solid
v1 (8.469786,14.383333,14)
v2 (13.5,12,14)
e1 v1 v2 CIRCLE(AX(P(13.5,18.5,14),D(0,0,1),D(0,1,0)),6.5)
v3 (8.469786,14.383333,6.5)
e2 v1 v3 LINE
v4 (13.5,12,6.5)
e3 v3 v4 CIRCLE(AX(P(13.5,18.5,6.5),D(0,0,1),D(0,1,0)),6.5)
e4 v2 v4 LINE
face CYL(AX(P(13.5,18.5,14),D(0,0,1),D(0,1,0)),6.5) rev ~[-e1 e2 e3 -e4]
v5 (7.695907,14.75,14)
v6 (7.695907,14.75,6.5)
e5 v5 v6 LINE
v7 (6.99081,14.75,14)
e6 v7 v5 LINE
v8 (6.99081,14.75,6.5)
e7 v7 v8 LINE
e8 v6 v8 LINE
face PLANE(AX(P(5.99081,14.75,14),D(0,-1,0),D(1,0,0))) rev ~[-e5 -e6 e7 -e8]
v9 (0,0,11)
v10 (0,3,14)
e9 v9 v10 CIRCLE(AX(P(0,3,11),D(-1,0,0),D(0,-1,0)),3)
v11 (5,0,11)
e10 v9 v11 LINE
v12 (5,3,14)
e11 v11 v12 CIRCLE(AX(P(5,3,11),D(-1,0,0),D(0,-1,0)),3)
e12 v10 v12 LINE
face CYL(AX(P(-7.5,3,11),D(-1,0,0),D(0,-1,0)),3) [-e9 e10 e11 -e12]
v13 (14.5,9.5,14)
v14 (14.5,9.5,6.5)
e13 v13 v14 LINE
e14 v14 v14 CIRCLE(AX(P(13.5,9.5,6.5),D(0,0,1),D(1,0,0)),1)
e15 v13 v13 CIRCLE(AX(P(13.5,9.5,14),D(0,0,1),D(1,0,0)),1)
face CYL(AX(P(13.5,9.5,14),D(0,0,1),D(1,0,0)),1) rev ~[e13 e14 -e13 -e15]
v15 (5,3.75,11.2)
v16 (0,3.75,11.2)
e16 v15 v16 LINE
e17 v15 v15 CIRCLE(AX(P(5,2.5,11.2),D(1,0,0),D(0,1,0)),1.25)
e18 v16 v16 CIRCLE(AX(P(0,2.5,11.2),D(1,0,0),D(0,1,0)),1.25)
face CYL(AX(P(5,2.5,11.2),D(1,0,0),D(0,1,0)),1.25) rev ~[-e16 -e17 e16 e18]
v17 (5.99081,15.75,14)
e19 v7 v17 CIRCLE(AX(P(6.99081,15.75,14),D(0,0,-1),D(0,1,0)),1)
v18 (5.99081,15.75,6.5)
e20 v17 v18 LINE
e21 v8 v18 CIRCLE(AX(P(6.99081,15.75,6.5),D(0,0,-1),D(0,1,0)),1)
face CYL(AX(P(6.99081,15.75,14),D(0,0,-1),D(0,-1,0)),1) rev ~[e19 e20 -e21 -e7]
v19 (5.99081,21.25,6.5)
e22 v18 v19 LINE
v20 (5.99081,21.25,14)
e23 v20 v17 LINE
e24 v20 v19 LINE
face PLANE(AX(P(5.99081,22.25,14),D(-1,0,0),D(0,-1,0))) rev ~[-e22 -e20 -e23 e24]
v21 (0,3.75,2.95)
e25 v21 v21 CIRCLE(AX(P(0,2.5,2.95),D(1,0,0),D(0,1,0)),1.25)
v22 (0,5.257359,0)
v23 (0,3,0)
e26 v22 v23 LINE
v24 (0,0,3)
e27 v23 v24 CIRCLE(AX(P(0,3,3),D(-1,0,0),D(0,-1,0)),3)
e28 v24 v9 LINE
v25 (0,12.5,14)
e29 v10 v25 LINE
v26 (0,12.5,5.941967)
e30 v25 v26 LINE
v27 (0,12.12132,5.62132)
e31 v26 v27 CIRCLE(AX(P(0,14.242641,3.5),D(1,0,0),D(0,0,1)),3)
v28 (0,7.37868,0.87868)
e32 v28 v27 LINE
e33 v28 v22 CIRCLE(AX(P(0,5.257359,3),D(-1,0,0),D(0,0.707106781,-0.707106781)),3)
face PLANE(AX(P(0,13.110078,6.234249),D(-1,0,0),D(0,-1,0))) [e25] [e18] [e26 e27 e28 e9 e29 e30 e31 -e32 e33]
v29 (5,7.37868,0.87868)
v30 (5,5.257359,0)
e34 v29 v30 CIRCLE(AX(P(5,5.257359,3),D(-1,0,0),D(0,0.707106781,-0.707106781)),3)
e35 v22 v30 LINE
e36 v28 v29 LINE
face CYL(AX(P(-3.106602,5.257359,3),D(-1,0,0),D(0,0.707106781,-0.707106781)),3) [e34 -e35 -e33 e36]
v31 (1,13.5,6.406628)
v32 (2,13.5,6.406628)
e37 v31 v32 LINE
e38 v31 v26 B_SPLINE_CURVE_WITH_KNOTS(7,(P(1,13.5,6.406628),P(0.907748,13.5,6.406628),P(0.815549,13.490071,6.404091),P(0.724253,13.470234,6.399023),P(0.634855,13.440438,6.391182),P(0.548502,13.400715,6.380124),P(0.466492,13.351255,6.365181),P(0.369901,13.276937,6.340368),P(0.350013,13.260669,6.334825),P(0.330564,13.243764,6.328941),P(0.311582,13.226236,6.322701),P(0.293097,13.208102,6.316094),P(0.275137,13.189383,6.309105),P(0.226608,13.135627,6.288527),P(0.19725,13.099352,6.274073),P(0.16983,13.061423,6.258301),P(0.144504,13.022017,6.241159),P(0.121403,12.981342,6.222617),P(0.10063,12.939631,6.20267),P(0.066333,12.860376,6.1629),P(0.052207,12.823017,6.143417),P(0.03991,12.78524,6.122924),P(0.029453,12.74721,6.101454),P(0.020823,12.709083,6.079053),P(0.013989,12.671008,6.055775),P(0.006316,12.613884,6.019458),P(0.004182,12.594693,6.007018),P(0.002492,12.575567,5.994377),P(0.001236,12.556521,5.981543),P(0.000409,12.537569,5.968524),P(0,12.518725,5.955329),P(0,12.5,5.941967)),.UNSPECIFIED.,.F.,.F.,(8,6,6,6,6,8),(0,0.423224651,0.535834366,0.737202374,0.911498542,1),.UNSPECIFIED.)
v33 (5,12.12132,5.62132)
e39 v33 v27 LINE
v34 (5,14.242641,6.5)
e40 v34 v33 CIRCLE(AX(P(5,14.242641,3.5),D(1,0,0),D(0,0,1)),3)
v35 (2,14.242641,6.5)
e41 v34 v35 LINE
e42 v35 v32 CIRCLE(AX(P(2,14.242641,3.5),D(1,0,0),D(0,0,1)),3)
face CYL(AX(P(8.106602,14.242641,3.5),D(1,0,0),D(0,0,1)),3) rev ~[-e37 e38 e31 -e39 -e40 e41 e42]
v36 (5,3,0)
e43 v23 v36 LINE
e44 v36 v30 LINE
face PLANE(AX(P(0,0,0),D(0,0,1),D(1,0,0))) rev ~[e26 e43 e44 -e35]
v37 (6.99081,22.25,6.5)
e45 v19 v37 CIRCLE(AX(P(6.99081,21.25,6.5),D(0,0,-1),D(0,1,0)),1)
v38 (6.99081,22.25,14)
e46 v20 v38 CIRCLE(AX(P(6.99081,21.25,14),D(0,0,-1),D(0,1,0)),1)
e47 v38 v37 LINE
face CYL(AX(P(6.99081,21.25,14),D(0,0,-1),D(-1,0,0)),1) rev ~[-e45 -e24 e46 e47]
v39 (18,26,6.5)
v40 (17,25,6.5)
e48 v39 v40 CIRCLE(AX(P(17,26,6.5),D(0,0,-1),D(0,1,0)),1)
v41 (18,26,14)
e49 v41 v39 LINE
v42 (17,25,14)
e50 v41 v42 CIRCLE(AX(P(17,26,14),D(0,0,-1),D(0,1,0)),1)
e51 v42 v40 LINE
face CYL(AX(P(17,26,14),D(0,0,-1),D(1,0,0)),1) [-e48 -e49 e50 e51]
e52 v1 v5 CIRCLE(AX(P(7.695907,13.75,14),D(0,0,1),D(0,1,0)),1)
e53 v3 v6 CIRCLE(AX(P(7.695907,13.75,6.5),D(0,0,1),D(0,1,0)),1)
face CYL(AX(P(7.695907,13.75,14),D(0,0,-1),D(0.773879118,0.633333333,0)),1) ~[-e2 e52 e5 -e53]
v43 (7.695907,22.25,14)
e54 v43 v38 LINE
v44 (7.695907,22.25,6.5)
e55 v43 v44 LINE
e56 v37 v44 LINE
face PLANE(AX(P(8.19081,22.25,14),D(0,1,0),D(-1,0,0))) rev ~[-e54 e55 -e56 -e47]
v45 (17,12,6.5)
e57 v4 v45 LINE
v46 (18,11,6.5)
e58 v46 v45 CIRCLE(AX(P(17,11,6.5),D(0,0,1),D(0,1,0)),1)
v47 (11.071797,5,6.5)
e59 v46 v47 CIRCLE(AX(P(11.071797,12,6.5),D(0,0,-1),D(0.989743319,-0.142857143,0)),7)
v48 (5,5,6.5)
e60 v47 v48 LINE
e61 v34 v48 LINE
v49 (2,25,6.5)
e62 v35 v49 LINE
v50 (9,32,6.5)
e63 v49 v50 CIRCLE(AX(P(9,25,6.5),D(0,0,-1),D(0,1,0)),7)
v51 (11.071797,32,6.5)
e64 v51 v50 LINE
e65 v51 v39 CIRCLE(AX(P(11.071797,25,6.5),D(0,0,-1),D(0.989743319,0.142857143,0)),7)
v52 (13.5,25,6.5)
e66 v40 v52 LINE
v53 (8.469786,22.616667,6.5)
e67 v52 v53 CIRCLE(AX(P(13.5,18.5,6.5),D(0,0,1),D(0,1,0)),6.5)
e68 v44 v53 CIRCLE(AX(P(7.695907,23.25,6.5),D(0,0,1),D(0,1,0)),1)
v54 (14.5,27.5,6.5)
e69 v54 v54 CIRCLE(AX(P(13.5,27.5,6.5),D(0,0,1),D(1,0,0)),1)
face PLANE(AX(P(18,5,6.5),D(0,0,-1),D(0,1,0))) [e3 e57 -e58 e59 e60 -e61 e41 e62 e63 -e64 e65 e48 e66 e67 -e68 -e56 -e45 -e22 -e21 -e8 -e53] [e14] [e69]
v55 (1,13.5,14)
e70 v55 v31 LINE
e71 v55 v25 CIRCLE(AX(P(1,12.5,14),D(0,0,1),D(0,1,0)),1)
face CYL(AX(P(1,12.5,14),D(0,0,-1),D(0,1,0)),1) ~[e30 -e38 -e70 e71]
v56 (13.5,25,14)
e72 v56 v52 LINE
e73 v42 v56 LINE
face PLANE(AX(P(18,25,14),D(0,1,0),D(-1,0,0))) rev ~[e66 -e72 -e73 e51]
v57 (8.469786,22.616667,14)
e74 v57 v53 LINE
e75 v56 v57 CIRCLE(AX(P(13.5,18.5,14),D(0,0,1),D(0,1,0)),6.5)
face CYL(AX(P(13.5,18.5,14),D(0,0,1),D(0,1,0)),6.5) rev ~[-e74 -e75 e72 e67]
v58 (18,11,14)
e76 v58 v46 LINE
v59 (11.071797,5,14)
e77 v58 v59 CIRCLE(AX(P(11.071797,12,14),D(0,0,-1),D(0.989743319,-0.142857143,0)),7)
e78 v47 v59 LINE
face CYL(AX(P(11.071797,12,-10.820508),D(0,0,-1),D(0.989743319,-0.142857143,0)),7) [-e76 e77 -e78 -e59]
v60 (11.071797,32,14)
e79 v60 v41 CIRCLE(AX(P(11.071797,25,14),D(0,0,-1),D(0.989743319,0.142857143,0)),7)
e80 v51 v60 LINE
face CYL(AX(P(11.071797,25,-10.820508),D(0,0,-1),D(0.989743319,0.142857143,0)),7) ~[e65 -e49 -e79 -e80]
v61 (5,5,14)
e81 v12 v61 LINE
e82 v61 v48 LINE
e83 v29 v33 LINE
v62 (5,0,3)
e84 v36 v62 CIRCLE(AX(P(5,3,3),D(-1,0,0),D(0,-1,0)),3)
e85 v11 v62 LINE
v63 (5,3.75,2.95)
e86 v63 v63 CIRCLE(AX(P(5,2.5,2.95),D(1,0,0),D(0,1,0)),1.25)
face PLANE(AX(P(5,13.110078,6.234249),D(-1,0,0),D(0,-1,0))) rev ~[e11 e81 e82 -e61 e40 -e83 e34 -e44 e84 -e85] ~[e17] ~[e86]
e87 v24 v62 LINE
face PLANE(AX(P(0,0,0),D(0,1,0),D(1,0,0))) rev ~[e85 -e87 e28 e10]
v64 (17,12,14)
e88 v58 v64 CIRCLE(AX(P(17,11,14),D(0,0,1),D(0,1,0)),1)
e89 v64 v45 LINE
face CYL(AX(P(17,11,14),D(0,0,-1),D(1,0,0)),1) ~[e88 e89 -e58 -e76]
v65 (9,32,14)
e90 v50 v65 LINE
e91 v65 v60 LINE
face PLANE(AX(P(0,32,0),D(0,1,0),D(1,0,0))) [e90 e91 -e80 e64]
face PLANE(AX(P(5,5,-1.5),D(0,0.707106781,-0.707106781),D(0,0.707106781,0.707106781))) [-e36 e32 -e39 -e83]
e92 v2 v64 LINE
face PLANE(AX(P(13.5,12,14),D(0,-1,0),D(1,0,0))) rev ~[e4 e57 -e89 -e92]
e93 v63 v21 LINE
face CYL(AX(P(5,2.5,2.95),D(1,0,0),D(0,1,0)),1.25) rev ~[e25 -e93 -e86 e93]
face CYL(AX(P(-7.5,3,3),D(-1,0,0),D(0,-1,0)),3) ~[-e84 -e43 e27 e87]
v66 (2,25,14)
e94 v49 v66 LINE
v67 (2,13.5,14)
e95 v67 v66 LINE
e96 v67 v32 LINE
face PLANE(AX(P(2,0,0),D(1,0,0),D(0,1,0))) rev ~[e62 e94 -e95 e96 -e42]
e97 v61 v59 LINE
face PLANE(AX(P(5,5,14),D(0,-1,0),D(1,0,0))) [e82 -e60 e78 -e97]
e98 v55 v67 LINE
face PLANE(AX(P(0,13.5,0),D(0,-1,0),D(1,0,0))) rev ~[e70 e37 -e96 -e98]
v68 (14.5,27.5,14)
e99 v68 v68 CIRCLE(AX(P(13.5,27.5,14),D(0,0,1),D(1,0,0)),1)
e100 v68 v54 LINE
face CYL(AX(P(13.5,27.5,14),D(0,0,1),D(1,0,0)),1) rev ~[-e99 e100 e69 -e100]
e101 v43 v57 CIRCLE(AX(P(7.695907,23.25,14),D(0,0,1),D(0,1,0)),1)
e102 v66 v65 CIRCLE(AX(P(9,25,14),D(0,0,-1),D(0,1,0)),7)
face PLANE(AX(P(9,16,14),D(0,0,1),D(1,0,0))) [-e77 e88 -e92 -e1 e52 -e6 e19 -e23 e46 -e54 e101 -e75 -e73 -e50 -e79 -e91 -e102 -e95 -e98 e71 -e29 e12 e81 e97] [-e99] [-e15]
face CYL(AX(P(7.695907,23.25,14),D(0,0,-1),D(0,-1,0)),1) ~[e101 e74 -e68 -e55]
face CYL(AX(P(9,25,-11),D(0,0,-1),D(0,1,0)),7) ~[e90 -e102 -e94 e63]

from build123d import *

# Parameters (mm, degrees)
F0_W          = 18
F0_H          = 32
F1_DEPTH      = 14
F2_W          = 13
F2_H          = 5
F2_W_2        = 2
F2_H_2        = 18.5
F3_DEPTH      = 14
F4_W          = 27
F4_H          = 6.5
F5_DEPTH      = 18.001
F6_R          = 1
F7_DEPTH      = 7.5
F8_R          = 1.25
F9_DEPTH      = 5
F10_T4_DEPTH  = 5
F11_T4_DEPTH  = 8.1066017178
F11_T9_DEPTH  = 8.1066017178
F11_T12_DEPTH = 20
F11_T14_DEPTH = 11.2132034356
F12_R         = 1
F13_T1_DEPTH  = 42.1410161514
F13_T3_DEPTH  = 42.5
F15_DEPTH     = 14.001
F16_R         = 1


# Not quite as in the source:
# - a fillet or chamfer that OpenCascade refuses, or shapes differently, is made with other operations: its cross-section is extruded or revolved along the edge and cut away or added


with BuildPart() as f1:
    # F0 (on Top) → F1 (new body)
    with BuildSketch(Plane.XY):
        with Locations((9, 16)):
            Rectangle(F0_W, F0_H)
    extrude(amount=F1_DEPTH)

    # F2 (on face) → F3 (cut, through all)
    with BuildSketch(Plane.XY.offset(14)):
        with Locations((11.5, 2.5)):
            Rectangle(F2_W, F2_H)
        with Locations((1, 22.75)):
            Rectangle(F2_W_2, F2_H_2)
    extrude(amount=-F3_DEPTH, mode=Mode.SUBTRACT)

    # F4 (on face) → F5 (cut, through all)
    with BuildSketch(Plane.YZ.offset(18)):
        with Locations((18.5, 3.25)):
            Rectangle(F4_W, F4_H)
    extrude(amount=-F5_DEPTH, mode=Mode.SUBTRACT)

    # F6 (on face) → F7 (cut, through all)
    with BuildSketch(Plane.XY.offset(14)):
        with Locations((13.5, 9.5)):
            Circle(F6_R)
        with BuildLine():
            ThreePointArc((18, 23.1904157598), (15.9251079936, 24.5306592691), (13.5, 25))
            ThreePointArc((13.5, 25), (7, 18.5), (13.5, 12))
            ThreePointArc((13.5, 12), (15.9251079936, 12.4693407309), (18, 13.8095842402))
            Line((18, 13.8095842402), (18, 23.1904157598))
        make_face()
        with Locations((13.5, 27.5)):
            Circle(F6_R)
        with BuildLine():
            Line((18, 25), (13.5, 25))
            ThreePointArc((13.5, 25), (15.9251079936, 24.5306592691), (18, 23.1904157598))
            Line((18, 23.1904157598), (18, 25))
        make_face()
        with BuildLine():
            ThreePointArc((18, 13.8095842402), (15.9251079936, 12.4693407309), (13.5, 12))
            Line((13.5, 12), (18, 12))
            Line((18, 12), (18, 13.8095842402))
        make_face()
    extrude(amount=-F7_DEPTH, mode=Mode.SUBTRACT)

    # F8 (on face) → F9 (cut, through all)
    with BuildSketch(Plane.YZ.offset(5)):
        with Locations((2.5, 11.2)):
            Circle(F8_R)
        with Locations((2.5, 2.95)):
            Circle(F8_R)
    extrude(amount=-F9_DEPTH, mode=Mode.SUBTRACT)

    # F10: chamfer of 8 on 1 edges, made by hand


with BuildPart() as f10_tool2:
    # F10_s3 → F10_t4 (new body)
    with BuildSketch(Plane.YZ.offset(5)):
        Polygon((5, -1.5), (13, 6.5), (5, 6.5), align=None)
    extrude(amount=-F10_T4_DEPTH)

    split(bisect_by=Plane.XY, keep=Keep.TOP)


with BuildPart() as f1_1:
    add(f1.part)

    # F10_t1: union F10_tool2
    add(f10_tool2.part)

    # F11: fillet of radius 3 on 5 edges, made by hand


with BuildPart() as f11_tool2:
    # F11_s3 → F11_t4 (new body)
    with BuildSketch(Plane.YZ.offset(5)):
        with BuildLine():
            ThreePointArc((14.2426406871, 6.5), (13.09459039, 6.2716385975), (12.1213203436, 5.6213203436))
            Line((12.1213203436, 5.6213203436), (13, 6.5))
            Line((13, 6.5), (14.2426406871, 6.5))
        make_face()
    extrude(amount=-F11_T4_DEPTH)

    split(bisect_by=Plane.YZ.offset(2), keep=Keep.TOP)


with BuildPart() as f1_2:
    add(f1_1.part)

    # F11_t1: union F11_tool2
    add(f11_tool2.part)


with BuildPart() as f11_tool7:
    # F11_s8 → F11_t9 (new body)
    with BuildSketch(Plane.YZ.offset(8.1066017178)):
        with BuildLine():
            ThreePointArc((14.2426406871, 6.5), (13.09459039, 6.2716385975), (12.1213203436, 5.6213203436))
            Line((12.1213203436, 5.6213203436), (13, 6.5))
            Line((13, 6.5), (14.2426406871, 6.5))
        make_face()
    extrude(amount=-F11_T9_DEPTH)

    split(bisect_by=Plane.YZ.offset(2), keep=Keep.BOTTOM)

    split(bisect_by=Plane.XZ.offset(-13.5), keep=Keep.TOP)


with BuildPart() as f1_3:
    add(f1_2.part)

    # F11_t6: union F11_tool7
    add(f11_tool7.part)

    # F11_s13 → F11_t12 (cut)
    with BuildSketch(Plane.YZ.offset(-7.5)):
        with BuildLine():
            ThreePointArc((0, 11), (0.8786796564, 13.1213203436), (3, 14))
            Line((3, 14), (0, 14))
            Line((0, 14), (0, 11))
        make_face()
        with BuildLine():
            ThreePointArc((0, 3), (0.8786796564, 0.8786796564), (3, 0))
            Line((3, 0), (0, 0))
            Line((0, 0), (0, 3))
        make_face()
    extrude(amount=F11_T12_DEPTH, mode=Mode.SUBTRACT)

    # F11_s15 → F11_t14 (cut)
    with BuildSketch(Plane.YZ.offset(-3.1066017178)):
        with BuildLine():
            ThreePointArc((7.3786796564, 0.8786796564), (6.40540961, 0.2283614025), (5.2573593129, 0))
            Line((5.2573593129, 0), (6.5, 0))
            Line((6.5, 0), (7.3786796564, 0.8786796564))
        make_face()
    extrude(amount=F11_T14_DEPTH, mode=Mode.SUBTRACT)

    # F12
    f12_edges = [f1_3.edges().sort_by_distance(p)[0] for p in [
        (18, 12, 10.25),
        (18, 25, 10.25),
    ]]
    fillet(f12_edges, radius=F12_R)

    # F13: fillet of radius 7 on 3 edges, made by hand

    # F13_s2 → F13_t1 (cut)
    with BuildSketch(Plane.XY.offset(-10.8205080757)):
        with BuildLine():
            ThreePointArc((18, 11), (15.6543724647, 6.7084973779), (11.0717967697, 5))
            Line((11.0717967697, 5), (11.0717967697, 4.86))
            Line((11.0717967697, 4.86), (18, 4.86))
            Line((18, 4.86), (18.14, 5))
            ThreePointArc((18.14, 5), (18.14, 8), (18.1385640646, 10.98))
            Line((18.1385640646, 10.98), (18, 11))
        make_face()
        with BuildLine():
            ThreePointArc((18, 26), (15.6543724647, 30.2915026221), (11.0717967697, 32))
            Line((11.0717967697, 32), (11.0717967697, 32.14))
            Line((11.0717967697, 32.14), (18, 32.14))
            Line((18, 32.14), (18.14, 32))
            ThreePointArc((18.14, 32), (18.14, 29), (18.1385640646, 26.02))
            Line((18.1385640646, 26.02), (18, 26))
        make_face()
    extrude(amount=F13_T1_DEPTH, mode=Mode.SUBTRACT)

    # F13_s4 → F13_t3 (cut)
    with BuildSketch(Plane.XY.offset(-11)):
        with BuildLine():
            ThreePointArc((9, 32), (4.0502525317, 29.9497474683), (2, 25))
            Line((2, 25), (1.86, 25))
            Line((1.86, 25), (1.86, 32.14))
            Line((1.86, 32.14), (9, 32.14))
            Line((9, 32.14), (9, 32))
        make_face()
    extrude(amount=F13_T3_DEPTH, mode=Mode.SUBTRACT)

    # F14 (on face) → F15 (cut, through all)
    with BuildSketch(Plane.XY.offset(14)):
        with BuildLine():
            ThreePointArc((8.1908098546, 14.75), (7, 18.5), (8.1908098546, 22.25))
            Line((8.1908098546, 22.25), (5.9908098546, 22.25))
            Line((5.9908098546, 22.25), (5.9908098546, 14.75))
            Line((5.9908098546, 14.75), (8.1908098546, 14.75))
        make_face()
    extrude(amount=-F15_DEPTH, mode=Mode.SUBTRACT)

    # F16
    f16_edges = [f1_3.edges().sort_by_distance(p)[0] for p in [
        (5.99081, 14.75, 10.25),
        (5.99081, 22.25, 10.25),
        (8.19081, 22.25, 10.25),
        (8.19081, 14.75, 10.25),
        (0, 13.5, 10.203314),
    ]]
    fillet(f16_edges, radius=F16_R)


solid = f1_3.part
